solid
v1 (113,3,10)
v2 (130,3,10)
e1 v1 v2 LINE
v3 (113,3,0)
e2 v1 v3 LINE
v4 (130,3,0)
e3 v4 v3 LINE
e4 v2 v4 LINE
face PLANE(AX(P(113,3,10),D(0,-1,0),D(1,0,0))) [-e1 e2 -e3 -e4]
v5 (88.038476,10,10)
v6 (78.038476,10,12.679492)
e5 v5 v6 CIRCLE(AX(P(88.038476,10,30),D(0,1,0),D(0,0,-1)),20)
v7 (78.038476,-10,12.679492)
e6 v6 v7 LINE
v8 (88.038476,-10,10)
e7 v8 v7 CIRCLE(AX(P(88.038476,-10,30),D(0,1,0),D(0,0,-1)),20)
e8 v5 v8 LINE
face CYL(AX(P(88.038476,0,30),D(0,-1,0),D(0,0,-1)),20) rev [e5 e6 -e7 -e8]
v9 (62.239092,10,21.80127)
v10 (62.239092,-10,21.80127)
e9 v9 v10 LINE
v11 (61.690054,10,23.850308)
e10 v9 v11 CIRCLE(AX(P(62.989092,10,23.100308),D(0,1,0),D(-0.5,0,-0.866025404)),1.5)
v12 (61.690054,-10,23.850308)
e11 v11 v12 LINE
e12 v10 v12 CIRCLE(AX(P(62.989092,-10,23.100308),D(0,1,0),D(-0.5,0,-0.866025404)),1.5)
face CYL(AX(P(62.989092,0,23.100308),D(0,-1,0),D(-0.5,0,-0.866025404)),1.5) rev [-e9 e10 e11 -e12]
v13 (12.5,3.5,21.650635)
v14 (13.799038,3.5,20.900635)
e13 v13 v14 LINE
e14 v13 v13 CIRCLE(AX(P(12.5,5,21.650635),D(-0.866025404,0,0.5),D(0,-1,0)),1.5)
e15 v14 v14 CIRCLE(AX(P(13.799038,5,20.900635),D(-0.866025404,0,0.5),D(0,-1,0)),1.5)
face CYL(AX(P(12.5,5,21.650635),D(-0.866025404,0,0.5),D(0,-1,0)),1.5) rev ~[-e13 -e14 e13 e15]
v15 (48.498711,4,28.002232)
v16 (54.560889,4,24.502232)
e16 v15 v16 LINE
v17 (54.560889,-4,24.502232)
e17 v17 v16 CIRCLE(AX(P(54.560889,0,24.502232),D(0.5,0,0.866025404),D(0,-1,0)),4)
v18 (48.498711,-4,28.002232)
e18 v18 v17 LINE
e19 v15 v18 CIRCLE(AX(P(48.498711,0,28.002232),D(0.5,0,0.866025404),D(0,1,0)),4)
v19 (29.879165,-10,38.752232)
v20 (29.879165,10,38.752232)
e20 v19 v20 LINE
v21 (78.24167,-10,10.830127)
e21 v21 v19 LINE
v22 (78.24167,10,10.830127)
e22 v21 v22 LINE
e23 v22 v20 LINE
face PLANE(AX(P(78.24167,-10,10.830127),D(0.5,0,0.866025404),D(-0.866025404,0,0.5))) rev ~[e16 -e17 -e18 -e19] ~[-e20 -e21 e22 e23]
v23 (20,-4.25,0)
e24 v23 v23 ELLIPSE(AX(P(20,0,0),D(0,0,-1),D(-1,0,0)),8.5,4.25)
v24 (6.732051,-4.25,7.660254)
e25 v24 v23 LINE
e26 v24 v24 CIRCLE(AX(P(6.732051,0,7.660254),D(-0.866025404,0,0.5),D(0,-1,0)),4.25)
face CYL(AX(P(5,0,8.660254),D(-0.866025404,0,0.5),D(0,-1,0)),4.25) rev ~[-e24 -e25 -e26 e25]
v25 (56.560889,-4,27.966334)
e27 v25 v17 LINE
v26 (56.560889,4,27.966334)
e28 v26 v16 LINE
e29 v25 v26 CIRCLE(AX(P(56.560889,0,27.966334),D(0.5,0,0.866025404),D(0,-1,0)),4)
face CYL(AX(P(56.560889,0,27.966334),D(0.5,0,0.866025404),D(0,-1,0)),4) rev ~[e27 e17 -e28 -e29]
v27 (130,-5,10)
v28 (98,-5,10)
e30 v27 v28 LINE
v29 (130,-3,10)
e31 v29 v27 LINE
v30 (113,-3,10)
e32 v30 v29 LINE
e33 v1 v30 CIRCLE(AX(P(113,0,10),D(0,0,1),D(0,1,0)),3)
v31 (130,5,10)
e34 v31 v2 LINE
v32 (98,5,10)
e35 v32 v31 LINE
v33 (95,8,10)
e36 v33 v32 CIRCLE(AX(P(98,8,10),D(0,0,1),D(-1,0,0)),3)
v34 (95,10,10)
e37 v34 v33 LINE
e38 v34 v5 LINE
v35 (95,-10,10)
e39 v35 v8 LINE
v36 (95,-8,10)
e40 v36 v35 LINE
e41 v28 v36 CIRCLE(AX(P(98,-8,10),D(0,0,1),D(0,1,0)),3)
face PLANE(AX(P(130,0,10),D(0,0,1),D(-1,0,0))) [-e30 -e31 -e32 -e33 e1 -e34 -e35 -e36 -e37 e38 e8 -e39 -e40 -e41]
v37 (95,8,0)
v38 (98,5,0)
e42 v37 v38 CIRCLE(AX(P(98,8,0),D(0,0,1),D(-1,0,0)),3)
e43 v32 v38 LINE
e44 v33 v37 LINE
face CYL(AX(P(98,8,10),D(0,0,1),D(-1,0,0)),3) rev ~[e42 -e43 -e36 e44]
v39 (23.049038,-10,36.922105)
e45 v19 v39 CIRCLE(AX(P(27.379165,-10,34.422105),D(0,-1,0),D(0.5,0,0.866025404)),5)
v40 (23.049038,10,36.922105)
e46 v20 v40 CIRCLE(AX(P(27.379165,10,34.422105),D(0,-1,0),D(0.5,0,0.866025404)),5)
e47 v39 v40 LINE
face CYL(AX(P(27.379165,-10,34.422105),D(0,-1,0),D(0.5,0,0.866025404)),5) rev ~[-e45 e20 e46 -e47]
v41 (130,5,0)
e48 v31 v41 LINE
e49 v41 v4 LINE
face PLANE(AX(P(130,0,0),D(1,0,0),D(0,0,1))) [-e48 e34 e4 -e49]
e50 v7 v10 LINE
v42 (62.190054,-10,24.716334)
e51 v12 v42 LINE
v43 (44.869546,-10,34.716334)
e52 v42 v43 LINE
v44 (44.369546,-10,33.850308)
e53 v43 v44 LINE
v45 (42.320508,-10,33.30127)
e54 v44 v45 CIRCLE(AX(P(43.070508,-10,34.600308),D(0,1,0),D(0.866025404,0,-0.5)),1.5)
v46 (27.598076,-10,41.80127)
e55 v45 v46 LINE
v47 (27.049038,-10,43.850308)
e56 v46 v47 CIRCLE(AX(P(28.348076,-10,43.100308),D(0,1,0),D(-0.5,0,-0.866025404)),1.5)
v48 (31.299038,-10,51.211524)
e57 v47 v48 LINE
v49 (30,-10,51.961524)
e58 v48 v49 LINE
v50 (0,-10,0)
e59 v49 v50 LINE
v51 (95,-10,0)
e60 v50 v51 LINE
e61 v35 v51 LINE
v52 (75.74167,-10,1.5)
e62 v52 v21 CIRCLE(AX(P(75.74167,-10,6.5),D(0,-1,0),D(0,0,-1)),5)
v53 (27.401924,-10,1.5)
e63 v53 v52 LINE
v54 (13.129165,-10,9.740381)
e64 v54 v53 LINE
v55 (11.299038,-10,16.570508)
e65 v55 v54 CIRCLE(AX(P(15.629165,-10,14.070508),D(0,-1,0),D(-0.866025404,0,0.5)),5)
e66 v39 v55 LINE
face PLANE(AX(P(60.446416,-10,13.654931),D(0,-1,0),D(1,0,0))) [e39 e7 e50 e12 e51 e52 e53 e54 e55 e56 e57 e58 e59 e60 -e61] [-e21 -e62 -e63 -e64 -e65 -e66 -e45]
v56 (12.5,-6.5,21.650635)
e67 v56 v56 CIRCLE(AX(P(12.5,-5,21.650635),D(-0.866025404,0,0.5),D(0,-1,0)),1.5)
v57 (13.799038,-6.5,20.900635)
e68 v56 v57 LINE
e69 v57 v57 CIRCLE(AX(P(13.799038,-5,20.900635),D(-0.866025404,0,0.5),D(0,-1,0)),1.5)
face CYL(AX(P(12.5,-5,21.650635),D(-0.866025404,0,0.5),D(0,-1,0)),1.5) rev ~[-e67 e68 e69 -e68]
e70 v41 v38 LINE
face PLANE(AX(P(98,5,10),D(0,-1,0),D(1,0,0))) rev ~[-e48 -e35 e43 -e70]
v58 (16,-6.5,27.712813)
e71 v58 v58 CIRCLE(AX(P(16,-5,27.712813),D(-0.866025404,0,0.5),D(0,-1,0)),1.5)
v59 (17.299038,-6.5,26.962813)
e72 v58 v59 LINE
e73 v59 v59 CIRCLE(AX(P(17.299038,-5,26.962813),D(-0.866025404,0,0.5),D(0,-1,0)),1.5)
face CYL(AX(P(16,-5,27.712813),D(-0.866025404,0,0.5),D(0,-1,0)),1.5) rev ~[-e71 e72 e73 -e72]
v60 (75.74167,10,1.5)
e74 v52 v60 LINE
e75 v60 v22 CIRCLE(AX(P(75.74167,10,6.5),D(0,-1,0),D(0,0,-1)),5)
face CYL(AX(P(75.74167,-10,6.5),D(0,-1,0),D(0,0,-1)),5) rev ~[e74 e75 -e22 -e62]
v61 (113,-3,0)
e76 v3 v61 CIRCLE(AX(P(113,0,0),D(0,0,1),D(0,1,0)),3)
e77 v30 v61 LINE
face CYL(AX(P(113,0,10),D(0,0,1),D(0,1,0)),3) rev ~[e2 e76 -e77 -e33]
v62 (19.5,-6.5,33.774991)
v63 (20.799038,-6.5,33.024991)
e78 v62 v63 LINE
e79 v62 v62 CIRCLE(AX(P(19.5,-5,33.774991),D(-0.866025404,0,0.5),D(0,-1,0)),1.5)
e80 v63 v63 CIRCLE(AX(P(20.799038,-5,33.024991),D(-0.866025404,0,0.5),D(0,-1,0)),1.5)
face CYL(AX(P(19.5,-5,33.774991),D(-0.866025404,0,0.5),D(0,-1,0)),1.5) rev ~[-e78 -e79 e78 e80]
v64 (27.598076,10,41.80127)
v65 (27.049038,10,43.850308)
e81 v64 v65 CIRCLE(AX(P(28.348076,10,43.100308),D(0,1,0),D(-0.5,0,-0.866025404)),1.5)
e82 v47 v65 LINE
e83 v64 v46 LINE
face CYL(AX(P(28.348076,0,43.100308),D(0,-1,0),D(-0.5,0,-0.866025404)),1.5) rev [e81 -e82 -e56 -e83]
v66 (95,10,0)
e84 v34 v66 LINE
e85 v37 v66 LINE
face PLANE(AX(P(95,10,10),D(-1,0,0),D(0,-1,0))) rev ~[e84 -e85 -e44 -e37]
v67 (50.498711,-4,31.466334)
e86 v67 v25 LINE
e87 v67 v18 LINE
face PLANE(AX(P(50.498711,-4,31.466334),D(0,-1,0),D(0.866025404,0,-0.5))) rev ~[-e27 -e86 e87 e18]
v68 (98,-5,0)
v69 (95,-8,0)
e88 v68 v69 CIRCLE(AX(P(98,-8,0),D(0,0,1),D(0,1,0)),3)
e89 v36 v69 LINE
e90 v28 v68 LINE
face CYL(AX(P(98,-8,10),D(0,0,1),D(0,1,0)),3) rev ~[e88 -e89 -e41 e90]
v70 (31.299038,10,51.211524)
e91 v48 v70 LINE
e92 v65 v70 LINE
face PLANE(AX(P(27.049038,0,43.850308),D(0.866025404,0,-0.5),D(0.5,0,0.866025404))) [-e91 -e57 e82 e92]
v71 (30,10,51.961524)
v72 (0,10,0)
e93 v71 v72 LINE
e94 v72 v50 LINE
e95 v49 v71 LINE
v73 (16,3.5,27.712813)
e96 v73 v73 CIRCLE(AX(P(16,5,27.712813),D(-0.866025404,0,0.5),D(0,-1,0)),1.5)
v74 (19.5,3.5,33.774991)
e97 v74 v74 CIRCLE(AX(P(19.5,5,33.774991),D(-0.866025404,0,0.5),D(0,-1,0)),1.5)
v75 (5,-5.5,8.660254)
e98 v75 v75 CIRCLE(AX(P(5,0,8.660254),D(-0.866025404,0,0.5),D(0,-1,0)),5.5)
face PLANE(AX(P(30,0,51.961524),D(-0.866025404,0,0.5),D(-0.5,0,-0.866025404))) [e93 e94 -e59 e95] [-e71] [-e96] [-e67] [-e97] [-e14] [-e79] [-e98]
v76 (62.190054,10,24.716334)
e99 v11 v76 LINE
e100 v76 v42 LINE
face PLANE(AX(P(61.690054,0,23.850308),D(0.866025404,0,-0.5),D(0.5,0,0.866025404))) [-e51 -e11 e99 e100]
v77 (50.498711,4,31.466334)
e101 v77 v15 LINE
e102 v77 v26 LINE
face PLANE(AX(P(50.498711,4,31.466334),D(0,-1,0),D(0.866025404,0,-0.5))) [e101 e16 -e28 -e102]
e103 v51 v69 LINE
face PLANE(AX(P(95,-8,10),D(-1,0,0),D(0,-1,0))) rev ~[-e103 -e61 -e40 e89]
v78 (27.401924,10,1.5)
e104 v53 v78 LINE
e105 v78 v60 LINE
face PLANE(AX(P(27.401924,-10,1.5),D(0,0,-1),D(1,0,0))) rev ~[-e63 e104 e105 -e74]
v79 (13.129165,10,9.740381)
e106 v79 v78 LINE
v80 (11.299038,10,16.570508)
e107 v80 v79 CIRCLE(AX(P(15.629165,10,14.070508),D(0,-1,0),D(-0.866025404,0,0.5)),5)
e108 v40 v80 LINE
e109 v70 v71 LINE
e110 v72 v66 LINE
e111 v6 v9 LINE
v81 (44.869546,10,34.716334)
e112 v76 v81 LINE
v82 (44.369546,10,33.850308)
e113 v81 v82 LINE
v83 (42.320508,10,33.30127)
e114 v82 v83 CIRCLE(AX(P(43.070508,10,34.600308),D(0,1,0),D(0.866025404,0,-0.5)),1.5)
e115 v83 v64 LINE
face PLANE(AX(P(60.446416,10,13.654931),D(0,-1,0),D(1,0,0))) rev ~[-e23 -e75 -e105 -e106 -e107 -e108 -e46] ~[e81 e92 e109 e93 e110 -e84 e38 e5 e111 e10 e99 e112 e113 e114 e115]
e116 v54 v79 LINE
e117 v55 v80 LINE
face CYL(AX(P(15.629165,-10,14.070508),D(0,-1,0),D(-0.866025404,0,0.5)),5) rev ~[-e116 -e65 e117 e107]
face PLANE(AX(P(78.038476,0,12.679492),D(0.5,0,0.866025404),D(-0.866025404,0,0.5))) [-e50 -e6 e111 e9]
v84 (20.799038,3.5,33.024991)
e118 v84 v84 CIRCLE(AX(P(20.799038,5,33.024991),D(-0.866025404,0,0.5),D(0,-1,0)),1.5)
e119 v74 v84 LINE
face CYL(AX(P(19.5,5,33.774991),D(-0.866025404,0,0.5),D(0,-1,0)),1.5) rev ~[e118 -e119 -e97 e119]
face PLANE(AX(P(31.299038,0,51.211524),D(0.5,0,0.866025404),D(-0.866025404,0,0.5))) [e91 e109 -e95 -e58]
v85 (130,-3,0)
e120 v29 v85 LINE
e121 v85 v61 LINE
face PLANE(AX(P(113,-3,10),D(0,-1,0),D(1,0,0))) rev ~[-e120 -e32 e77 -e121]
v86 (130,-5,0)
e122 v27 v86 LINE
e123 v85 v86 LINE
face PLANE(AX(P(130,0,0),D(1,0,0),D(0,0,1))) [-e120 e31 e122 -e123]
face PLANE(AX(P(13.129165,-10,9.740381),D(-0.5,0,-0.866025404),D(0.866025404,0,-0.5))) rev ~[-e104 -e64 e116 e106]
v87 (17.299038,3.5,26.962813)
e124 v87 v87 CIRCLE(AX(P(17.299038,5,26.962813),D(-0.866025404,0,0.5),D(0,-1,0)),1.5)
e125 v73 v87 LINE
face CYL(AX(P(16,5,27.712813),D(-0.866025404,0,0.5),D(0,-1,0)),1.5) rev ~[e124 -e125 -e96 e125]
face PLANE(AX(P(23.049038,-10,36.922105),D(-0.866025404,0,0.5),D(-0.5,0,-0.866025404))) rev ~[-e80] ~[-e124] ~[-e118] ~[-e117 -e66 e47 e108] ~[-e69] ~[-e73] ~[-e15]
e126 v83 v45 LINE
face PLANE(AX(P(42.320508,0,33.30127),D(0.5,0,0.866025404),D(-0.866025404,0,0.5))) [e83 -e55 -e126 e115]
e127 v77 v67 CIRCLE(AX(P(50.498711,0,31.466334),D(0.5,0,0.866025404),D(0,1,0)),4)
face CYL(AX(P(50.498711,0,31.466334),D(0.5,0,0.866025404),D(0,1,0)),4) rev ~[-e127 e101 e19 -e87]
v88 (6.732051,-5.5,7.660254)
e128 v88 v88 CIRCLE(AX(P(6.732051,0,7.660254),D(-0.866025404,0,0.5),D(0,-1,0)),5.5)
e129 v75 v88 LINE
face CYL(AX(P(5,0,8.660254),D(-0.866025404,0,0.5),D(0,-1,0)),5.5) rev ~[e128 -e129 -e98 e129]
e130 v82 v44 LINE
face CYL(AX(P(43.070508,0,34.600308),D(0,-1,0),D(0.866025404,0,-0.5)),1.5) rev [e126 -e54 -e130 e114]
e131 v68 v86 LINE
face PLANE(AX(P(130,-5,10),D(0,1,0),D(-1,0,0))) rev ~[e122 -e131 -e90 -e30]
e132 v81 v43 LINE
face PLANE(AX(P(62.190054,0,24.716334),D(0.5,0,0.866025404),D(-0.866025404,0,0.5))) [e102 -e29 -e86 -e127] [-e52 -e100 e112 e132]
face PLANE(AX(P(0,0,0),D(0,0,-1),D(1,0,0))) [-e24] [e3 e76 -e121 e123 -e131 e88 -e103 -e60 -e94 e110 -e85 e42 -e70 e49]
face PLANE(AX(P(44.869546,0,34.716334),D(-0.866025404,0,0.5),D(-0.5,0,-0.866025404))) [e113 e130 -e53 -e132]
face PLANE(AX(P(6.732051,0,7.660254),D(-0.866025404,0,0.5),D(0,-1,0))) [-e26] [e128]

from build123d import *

# Parameters (mm, degrees)
F1_DEPTH      = 10
F3_DEPTH      = 20.001
F3_DEPTH_BACK = 197
F4_R          = 1.5
F5_DEPTH      = 1.5
F4_R_2        = 4.25
F6_DEPTH      = 112.584302492
F4_R_3        = 5.5
F7_DEPTH      = 2
F8_W          = 17
F8_H          = 6
F9_DEPTH      = 10.001
F10_W         = 7
F10_H         = 8
F11_DEPTH     = 4


# Not quite as in the source:
# - an extrude ends at something that could not be found from the text; its depth is read off the source's solid


with BuildPart() as f1:
    # F0 (on Front) → F1 (new body, symmetric)
    with BuildSketch(Plane.XZ):
        with BuildLine():
            Line((30, 51.9615242271), (0, 0))
            Line((0, 0), (130, 0))
            Line((130, 0), (130, 10))
            Line((130, 10), (88.0384757729, 10))
            ThreePointArc((88.0384757729, 10), (82.8620948709, 10.6814834742), (78.0384757729, 12.6794919243))
            Line((78.0384757729, 12.6794919243), (62.2390923627, 21.8012701892))
            ThreePointArc((62.2390923627, 21.8012701892), (61.5402036233, 22.7120797272), (61.6900542571, 23.8503082949))
            Line((61.6900542571, 23.8503082949), (62.1900542571, 24.7163336987))
            Line((62.1900542571, 24.7163336987), (44.8695461814, 34.7163336987))
            Line((44.8695461814, 34.7163336987), (44.3695461814, 33.8503082949))
            ThreePointArc((44.3695461814, 33.8503082949), (43.4587366433, 33.1514195555), (42.3205080757, 33.3012701892))
            Line((42.3205080757, 33.3012701892), (27.5980762114, 41.8012701892))
            ThreePointArc((27.5980762114, 41.8012701892), (26.8991874719, 42.7120797272), (27.0490381057, 43.8503082949))
            Line((27.0490381057, 43.8503082949), (31.2990381057, 51.2115242271))
            Line((31.2990381057, 51.2115242271), (30, 51.9615242271))
        make_face()
        with BuildLine():
            ThreePointArc((23.0490381057, 36.9221050646), (26.0850698991, 39.2517341961), (29.8791651246, 38.7522320835))
            Line((29.8791651246, 38.7522320835), (78.2416697508, 10.8301270189))
            ThreePointArc((78.2416697508, 10.8301270189), (80.5712988822, 5.2059047745), (75.7416697508, 1.5))
            Line((75.7416697508, 1.5), (27.4019237886, 1.5))
            Line((27.4019237886, 1.5), (13.1291651246, 9.7403810568))
            ThreePointArc((13.1291651246, 9.7403810568), (10.7995359932, 12.7764128502), (11.2990381057, 16.5705080757))
            Line((11.2990381057, 16.5705080757), (23.0490381057, 36.9221050646))
        make_face(mode=Mode.SUBTRACT)
        with BuildLine():
            Line((78.2416697508, 10.8301270189), (29.8791651246, 38.7522320835))
            ThreePointArc((29.8791651246, 38.7522320835), (26.0850698991, 39.2517341961), (23.0490381057, 36.9221050646))
            Line((23.0490381057, 36.9221050646), (11.2990381057, 16.5705080757))
            ThreePointArc((11.2990381057, 16.5705080757), (10.7995359932, 12.7764128502), (13.1291651246, 9.7403810568))
            Line((13.1291651246, 9.7403810568), (27.4019237886, 1.5))
            Line((27.4019237886, 1.5), (75.7416697508, 1.5))
            ThreePointArc((75.7416697508, 1.5), (80.5712988822, 5.2059047745), (78.2416697508, 10.8301270189))
        make_face()
    extrude(amount=F1_DEPTH, both=True)

    # F2 (on face) → F3 (cut, two sides)
    with BuildSketch(Plane.XZ.offset(10)) as f3_sk:
        with BuildLine():
            ThreePointArc((29.8791651246, 38.7522320835), (26.0850698991, 39.2517341961), (23.0490381057, 36.9221050646))
            Line((23.0490381057, 36.9221050646), (11.2990381057, 16.5705080757))
            ThreePointArc((11.2990381057, 16.5705080757), (10.7995359932, 12.7764128502), (13.1291651246, 9.7403810568))
            Line((13.1291651246, 9.7403810568), (27.4019237886, 1.5))
            Line((27.4019237886, 1.5), (75.7416697508, 1.5))
            ThreePointArc((75.7416697508, 1.5), (80.5712988822, 5.2059047745), (78.2416697508, 10.8301270189))
            Line((78.2416697508, 10.8301270189), (29.8791651246, 38.7522320835))
        make_face()
    extrude(amount=-F3_DEPTH, mode=Mode.SUBTRACT)
    extrude(f3_sk.sketch, amount=F3_DEPTH_BACK, mode=Mode.SUBTRACT)

    # F4 (on face) → F5 (cut, through all)
    with BuildSketch(Plane(origin=(0, 0, 0), x_dir=(0, -1, 0), z_dir=(-0.8660254038, 0, 0.5))):
        with Locations((-5, 25)):
            Circle(F4_R)
        with Locations((-5, 32)):
            Circle(F4_R)
        with Locations((-5, 39)):
            Circle(F4_R)
        with Locations((5, 39)):
            Circle(F4_R)
        with Locations((5, 32)):
            Circle(F4_R)
        with Locations((5, 25)):
            Circle(F4_R)
    extrude(amount=-F5_DEPTH, mode=Mode.SUBTRACT)

    # F4 (on face) → F6 (cut, through all)
    with BuildSketch(Plane(origin=(0, 0, 0), x_dir=(0, -1, 0), z_dir=(-0.8660254038, 0, 0.5))):
        with Locations((0, 10)):
            Circle(F4_R_2)
    extrude(amount=-F6_DEPTH, mode=Mode.SUBTRACT)

    # F4 (on face) → F7 (cut)
    with BuildSketch(Plane(origin=(0, 0, 0), x_dir=(0, -1, 0), z_dir=(-0.8660254038, 0, 0.5))):
        with Locations((0, 10)):
            Circle(F4_R_3)
        with Locations((0, 10)):
            Circle(F4_R_2, mode=Mode.SUBTRACT)
    extrude(amount=-F7_DEPTH, mode=Mode.SUBTRACT)

    # F8 (on face) → F9 (cut, through all)
    with BuildSketch(Plane.XY.offset(10)):
        with Locations((121.5, 0)):
            Rectangle(F8_W, F8_H)
        with BuildLine():
            ThreePointArc((113, 3), (110, 0), (113, -3))
            Line((113, -3), (113, 3))
        make_face()
        with BuildLine():
            Line((130, -10), (130, -5))
            Line((130, -5), (98, -5))
            ThreePointArc((98, -5), (95.8786796564, -5.8786796564), (95, -8))
            Line((95, -8), (95, -10))
            Line((95, -10), (130, -10))
        make_face()
        with BuildLine():
            Line((98, 5), (130, 5))
            Line((130, 5), (130, 10))
            Line((130, 10), (95, 10))
            Line((95, 10), (95, 8))
            ThreePointArc((95, 8), (95.8786796564, 5.8786796564), (98, 5))
        make_face()
    extrude(amount=-F9_DEPTH, mode=Mode.SUBTRACT)

    # F10 (on face) → F11 (cut, through all)
    with BuildSketch(Plane(origin=(26.25, 0, 45.4663336987), x_dir=(0.8660254038, 0, -0.5), z_dir=(0.5, 0, 0.8660254038))):
        with BuildLine():
            ThreePointArc((28, 4), (24, 0), (28, -4))
            Line((28, -4), (28, 4))
        make_face()
        with Locations((31.5, 0)):
            Rectangle(F10_W, F10_H)
        with BuildLine():
            Line((35, 4), (35, -4))
            ThreePointArc((35, -4), (39, 0), (35, 4))
        make_face()
    extrude(amount=-F11_DEPTH, mode=Mode.SUBTRACT)


solid = f1.part
